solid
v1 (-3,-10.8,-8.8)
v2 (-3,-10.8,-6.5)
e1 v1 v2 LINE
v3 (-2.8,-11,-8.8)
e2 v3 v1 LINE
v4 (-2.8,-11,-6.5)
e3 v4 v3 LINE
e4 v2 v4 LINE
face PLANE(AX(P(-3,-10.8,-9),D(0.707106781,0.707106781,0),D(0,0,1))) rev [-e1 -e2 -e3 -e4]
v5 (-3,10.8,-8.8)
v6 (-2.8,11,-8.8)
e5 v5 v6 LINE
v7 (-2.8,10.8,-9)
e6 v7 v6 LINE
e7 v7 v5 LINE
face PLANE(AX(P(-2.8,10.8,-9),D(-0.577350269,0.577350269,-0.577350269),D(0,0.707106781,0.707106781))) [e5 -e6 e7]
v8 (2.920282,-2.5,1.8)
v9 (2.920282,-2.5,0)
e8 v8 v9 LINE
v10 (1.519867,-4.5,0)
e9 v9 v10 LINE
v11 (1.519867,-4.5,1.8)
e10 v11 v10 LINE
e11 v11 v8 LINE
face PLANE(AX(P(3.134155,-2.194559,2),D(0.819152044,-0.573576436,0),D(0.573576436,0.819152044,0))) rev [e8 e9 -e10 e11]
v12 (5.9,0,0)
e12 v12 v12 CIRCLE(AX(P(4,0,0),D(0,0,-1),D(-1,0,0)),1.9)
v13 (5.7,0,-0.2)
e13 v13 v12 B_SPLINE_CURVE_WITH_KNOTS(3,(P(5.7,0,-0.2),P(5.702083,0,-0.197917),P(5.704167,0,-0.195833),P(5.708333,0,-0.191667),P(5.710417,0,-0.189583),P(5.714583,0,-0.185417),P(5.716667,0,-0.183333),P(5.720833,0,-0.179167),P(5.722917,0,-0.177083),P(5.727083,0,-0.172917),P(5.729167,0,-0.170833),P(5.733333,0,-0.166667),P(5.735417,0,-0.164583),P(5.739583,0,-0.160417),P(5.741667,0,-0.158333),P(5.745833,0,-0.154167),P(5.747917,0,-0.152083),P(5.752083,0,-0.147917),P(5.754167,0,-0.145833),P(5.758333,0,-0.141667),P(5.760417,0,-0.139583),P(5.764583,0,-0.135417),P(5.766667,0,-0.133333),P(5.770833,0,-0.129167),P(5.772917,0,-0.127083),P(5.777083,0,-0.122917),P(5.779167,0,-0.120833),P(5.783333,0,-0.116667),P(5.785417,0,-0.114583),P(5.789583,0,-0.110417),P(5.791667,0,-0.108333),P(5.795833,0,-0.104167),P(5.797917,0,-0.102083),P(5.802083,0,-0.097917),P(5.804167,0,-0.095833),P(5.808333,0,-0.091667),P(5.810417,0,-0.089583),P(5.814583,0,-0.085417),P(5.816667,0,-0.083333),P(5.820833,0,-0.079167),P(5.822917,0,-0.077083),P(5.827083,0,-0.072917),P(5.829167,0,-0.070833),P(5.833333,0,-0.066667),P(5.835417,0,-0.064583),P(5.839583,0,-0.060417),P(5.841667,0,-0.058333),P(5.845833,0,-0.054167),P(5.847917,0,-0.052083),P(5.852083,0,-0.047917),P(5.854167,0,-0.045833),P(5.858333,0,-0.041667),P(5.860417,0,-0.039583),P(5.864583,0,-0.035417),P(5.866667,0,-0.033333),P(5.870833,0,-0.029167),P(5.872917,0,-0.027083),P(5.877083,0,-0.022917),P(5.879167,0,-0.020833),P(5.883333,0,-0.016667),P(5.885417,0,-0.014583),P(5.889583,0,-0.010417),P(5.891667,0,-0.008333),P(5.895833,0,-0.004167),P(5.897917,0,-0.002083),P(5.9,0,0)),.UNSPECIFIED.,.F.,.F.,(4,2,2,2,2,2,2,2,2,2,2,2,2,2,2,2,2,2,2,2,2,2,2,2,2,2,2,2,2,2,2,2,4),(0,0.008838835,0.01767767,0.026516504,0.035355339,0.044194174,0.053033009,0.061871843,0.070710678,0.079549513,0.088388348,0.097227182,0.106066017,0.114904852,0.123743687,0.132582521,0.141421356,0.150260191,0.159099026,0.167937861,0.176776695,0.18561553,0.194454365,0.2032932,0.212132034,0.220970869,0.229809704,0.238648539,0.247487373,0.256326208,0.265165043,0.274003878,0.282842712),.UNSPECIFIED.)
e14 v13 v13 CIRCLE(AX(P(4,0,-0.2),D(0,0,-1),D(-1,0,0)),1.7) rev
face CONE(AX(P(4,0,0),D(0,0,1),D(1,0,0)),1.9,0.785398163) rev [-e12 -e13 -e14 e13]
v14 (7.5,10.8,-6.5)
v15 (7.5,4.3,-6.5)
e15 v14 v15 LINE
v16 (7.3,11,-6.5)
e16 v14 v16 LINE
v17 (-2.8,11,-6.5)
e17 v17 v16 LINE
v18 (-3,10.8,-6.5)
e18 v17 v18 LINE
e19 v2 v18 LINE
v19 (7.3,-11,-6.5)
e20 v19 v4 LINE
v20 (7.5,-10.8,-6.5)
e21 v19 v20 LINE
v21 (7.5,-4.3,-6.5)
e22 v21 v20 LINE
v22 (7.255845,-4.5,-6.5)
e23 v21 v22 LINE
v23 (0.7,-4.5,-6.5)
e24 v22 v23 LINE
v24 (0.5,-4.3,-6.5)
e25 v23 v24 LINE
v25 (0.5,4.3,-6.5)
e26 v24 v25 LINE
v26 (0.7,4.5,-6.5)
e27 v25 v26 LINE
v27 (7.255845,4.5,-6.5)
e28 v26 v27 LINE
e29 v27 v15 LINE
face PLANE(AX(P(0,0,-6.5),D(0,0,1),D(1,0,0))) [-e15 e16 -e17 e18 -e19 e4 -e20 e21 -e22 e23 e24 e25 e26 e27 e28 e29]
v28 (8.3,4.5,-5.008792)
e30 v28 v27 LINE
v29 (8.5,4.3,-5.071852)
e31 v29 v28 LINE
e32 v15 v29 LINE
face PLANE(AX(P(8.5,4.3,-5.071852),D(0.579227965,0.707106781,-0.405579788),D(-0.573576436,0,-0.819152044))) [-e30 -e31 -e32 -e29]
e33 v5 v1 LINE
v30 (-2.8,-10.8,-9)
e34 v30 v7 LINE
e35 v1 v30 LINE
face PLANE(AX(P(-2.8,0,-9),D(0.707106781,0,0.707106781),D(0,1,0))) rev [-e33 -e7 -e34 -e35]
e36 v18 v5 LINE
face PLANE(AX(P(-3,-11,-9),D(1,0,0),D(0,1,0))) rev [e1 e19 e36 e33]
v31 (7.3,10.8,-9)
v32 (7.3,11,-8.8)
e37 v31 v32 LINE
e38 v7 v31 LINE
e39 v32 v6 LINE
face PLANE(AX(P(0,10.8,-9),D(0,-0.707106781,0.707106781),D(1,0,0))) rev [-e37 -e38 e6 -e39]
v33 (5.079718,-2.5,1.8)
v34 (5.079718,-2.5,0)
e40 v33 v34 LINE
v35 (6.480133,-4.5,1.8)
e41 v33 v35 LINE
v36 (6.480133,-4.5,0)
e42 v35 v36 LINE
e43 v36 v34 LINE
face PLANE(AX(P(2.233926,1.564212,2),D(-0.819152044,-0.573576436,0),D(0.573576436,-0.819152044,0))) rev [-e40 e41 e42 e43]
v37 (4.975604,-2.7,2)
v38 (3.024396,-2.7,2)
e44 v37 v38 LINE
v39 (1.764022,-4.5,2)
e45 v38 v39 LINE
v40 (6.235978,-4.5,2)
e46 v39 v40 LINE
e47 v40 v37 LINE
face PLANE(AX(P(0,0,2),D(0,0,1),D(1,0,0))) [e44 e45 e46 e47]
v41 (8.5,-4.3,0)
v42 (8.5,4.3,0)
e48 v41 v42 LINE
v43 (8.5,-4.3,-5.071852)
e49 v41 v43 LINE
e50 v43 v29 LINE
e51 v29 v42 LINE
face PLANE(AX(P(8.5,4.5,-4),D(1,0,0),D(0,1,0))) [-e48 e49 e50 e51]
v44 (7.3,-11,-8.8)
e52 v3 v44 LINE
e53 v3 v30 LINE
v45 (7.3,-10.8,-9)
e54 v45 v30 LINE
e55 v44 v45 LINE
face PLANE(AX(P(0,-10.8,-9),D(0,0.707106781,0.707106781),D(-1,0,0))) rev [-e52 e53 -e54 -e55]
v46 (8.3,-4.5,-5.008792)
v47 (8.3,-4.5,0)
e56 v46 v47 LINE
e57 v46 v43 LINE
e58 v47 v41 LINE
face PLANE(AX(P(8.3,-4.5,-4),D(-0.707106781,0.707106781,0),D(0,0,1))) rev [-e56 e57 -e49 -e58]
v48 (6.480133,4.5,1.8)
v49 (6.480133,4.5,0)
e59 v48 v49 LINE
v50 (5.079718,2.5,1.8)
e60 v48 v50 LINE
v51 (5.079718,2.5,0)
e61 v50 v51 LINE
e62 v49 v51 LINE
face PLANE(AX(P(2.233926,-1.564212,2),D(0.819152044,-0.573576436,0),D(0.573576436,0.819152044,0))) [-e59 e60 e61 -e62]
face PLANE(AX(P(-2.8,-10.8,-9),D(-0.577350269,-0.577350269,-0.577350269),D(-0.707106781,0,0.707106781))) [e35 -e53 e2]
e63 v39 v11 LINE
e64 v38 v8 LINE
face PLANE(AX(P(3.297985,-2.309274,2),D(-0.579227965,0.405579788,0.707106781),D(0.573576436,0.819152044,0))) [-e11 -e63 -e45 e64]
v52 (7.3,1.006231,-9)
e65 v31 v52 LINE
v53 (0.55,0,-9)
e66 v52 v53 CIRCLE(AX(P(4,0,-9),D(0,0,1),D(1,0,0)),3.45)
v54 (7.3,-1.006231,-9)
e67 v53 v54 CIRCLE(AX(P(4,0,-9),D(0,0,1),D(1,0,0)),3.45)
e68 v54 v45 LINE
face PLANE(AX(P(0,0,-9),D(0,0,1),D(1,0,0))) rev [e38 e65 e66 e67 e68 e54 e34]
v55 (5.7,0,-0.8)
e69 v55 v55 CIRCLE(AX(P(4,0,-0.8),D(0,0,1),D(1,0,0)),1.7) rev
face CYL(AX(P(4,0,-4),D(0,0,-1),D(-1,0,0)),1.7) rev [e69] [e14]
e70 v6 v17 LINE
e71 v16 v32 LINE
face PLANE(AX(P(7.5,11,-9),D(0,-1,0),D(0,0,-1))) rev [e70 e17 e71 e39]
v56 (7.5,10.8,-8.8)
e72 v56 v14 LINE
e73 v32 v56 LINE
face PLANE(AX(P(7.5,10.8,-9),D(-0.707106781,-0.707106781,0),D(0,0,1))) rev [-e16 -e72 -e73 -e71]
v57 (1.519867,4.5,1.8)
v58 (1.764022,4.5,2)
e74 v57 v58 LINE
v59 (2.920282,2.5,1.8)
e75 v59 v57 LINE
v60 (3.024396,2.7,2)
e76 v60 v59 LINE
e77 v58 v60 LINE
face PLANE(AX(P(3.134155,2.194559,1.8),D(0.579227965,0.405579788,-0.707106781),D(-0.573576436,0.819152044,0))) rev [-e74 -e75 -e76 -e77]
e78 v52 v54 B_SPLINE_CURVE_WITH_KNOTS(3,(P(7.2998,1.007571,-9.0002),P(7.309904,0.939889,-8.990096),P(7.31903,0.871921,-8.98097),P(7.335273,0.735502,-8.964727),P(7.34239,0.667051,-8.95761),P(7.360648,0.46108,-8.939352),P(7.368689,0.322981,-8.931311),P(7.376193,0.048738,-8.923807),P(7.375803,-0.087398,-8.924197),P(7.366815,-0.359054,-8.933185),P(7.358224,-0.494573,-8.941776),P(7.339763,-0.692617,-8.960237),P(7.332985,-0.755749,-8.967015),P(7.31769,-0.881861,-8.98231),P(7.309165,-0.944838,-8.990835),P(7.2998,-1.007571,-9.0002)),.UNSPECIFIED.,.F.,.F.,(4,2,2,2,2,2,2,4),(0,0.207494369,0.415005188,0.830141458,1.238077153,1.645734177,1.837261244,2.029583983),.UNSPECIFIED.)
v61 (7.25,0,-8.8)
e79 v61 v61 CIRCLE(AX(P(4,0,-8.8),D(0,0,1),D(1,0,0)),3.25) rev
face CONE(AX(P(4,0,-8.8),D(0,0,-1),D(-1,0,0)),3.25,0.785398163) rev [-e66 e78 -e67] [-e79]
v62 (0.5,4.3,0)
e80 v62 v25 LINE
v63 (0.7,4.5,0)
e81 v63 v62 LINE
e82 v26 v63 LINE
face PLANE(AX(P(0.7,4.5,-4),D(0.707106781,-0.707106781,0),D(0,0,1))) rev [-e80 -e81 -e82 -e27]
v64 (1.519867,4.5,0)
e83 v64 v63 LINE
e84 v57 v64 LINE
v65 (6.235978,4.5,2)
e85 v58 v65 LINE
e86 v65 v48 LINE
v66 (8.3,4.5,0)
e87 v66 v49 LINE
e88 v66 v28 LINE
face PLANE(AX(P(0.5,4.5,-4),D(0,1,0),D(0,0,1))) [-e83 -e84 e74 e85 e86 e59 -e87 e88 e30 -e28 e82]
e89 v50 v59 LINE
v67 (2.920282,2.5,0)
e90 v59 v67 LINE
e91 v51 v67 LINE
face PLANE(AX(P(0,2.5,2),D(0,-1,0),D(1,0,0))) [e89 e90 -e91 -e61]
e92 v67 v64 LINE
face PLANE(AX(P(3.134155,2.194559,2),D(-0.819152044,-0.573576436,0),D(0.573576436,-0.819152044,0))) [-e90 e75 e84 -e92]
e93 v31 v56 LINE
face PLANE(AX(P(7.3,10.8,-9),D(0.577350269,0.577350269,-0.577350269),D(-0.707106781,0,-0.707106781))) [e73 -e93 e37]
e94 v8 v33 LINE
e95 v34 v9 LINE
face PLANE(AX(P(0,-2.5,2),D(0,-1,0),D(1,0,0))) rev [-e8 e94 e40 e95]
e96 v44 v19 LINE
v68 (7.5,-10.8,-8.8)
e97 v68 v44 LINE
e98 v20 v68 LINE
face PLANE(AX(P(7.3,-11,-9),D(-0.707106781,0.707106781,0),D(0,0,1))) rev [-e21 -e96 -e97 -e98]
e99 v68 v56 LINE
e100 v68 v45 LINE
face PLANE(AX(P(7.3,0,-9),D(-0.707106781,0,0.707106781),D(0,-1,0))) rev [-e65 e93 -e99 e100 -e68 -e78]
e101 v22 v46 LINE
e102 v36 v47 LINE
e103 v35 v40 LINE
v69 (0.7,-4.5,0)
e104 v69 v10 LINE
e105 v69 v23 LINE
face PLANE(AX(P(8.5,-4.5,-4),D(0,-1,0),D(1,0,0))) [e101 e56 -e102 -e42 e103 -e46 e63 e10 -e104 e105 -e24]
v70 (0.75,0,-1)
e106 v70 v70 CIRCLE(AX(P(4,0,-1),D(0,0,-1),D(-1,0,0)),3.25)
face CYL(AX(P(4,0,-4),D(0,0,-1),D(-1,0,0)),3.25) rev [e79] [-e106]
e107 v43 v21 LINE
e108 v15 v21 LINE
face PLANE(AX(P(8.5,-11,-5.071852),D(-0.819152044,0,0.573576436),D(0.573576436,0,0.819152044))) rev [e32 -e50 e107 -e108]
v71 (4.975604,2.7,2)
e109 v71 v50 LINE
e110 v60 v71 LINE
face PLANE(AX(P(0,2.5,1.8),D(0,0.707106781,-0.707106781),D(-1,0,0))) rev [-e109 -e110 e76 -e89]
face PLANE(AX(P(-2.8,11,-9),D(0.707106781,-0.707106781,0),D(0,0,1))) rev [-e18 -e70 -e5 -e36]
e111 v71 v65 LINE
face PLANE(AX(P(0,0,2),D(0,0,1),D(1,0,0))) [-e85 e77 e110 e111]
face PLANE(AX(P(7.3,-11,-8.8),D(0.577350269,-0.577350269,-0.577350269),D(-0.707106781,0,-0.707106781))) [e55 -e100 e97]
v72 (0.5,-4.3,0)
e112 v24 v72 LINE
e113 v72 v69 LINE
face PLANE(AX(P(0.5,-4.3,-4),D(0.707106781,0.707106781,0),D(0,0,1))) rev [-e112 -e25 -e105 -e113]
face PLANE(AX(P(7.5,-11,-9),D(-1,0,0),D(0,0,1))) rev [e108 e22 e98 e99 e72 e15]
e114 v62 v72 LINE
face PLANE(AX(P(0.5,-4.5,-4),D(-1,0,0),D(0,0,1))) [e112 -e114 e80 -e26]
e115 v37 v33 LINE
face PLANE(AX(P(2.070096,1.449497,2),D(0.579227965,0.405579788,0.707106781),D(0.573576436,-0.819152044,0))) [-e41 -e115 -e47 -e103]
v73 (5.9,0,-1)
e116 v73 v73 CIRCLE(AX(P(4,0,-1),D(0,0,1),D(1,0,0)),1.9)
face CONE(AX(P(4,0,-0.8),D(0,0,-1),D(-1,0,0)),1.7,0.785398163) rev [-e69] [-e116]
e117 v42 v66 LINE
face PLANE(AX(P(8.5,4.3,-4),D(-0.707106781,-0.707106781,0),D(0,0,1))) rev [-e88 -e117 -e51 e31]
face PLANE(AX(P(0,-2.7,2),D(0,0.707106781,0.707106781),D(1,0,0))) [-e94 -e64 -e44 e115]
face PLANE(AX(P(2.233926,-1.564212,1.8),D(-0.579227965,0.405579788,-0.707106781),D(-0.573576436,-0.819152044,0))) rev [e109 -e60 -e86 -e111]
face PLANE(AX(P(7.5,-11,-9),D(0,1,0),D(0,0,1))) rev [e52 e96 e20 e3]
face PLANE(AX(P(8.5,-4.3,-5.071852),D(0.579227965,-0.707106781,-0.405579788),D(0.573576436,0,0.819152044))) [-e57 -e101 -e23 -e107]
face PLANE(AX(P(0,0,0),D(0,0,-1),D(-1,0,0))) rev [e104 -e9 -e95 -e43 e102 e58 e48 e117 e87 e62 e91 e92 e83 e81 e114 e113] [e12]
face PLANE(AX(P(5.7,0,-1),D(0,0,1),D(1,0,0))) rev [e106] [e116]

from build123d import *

# Parameters (mm, degrees)
BOSS_EXTRUDE1_DEPTH            = 4
SLOT_TAB_DEPTH                 = 2
CBORE_FOR_M3_SHCS2_D           = 3.4
CBORE_FOR_M3_SHCS2_CBORE_D     = 6.5
CBORE_FOR_M3_SHCS2_CBORE_DEPTH = 3
STOPPER_START                  = 2.5
SKETCH3_W                      = 8
SKETCH3_H                      = 9
SKETCH3_R                      = 3.25
STOPPER_CLEARANCE_DEPTH        = 2.5
SKETCH4_W                      = 10.5
SKETCH4_H                      = 22
SKETCH4_R                      = 3.25
STOPPER_DEPTH                  = 2.5
PRINT_CHAMFER_DEPTH            = 17.560495216
PRINT_CHAMFER_DEPTH_BACK       = 17.560495216
CHAMFER5_SIZE                  = 0.2


with BuildPart() as part:
    # Sketch1 → Boss-Extrude1 (new body)
    with BuildSketch(Plane.XY):
        Polygon((0.5, -4.5), (7.5, -4.5), (8.5, -4.5), (8.5, 4.5), (7.5, 4.5), (0.5, 4.5), align=None)
    extrude(amount=-BOSS_EXTRUDE1_DEPTH)

    # Sketch2 → Slot Tab (add)
    with BuildSketch(Plane.XY):
        Polygon((2.92028223, -2.5), (1.519867154, -4.5), (6.480132846, -4.5), (5.07971777, -2.5), align=None)
    slot_tab = extrude(amount=SLOT_TAB_DEPTH)

    # Slot Tabs: Slot Tab across plane
    add(slot_tab.mirror(Plane.ZX))

    # CBORE for M3 SHCS2 (through all)
    with Locations(Plane(origin=(0, 0, -4), x_dir=(-1, 0, 0), z_dir=(0, 0, -1))):
        with Locations((-4, 0)):
            CounterBoreHole(CBORE_FOR_M3_SHCS2_D / 2, CBORE_FOR_M3_SHCS2_CBORE_D / 2, CBORE_FOR_M3_SHCS2_CBORE_DEPTH)

    # Sketch3 → Stopper Clearance (add)
    with BuildSketch(Plane(origin=(0, 0, -4), x_dir=(-1, 0, 0), z_dir=(0, 0, -1)).offset(STOPPER_START)):
        with Locations((-4.5, 0)):
            Rectangle(SKETCH3_W, SKETCH3_H)
        with Locations((-4, 0)):
            Circle(SKETCH3_R, mode=Mode.SUBTRACT)
    extrude(amount=-STOPPER_CLEARANCE_DEPTH)

    # Sketch4 → Stopper (add)
    with BuildSketch(Plane(origin=(0, 0, -6.5), x_dir=(-1, 0, 0), z_dir=(0, 0, -1)).offset(STOPPER_START)):
        with Locations((-2.25, 0)):
            Rectangle(SKETCH4_W, SKETCH4_H)
        with Locations((-4, 0)):
            Circle(SKETCH4_R, mode=Mode.SUBTRACT)
    extrude(amount=-STOPPER_DEPTH)

    # Deburs With Stopper
    # the kernel refuses this chamfer: 0.2 mm, written as the material it takes off along each edge
    with BuildSketch(Plane(origin=(-2.866666667, -10.866666667, -8.866666667), x_dir=(-0.7071067811865491, 0, 0.707106781186546), z_dir=(-0.5773502691896235, -0.5773502691896274, -0.5773502691896262)), Plane(origin=(-2.866666667, 10.866666667, -8.866666667), x_dir=(1.5700924586837806e-15, 0.7071067811865476, 0.7071067811865476), z_dir=(-0.5773502691896244, 0.5773502691896271, -0.5773502691896257)), Plane(origin=(7.366666667, 10.866666667, -8.866666667), x_dir=(0.7071067811865491, 0, 0.707106781186546), z_dir=(0.5773502691896232, 0.5773502691896284, -0.5773502691896257))) as deburs_with_stopper_piece_1:
        Polygon((-0.141421356, 0.081649658), (0.141421356, 0.081649658), (0, -0.163299316), align=None)
    extrude(amount=0.254034118, mode=Mode.SUBTRACT)
    with BuildSketch(Plane(origin=(7.366666667, -10.866666667, -8.866666667), x_dir=(0.7071067811865491, 0, 0.707106781186546), z_dir=(0.5773502691896241, -0.5773502691896267, -0.5773502691896267))) as deburs_with_stopper_piece_2:
        Polygon((-0.141421356, -0.081649658), (0.141421356, -0.081649658), (0, 0.163299316), align=None)
    extrude(amount=0.254034118, mode=Mode.SUBTRACT)
    with BuildSketch(Plane(origin=(8.5, 4.5, -7.014336598), x_dir=(-0.9996219169112966, 0.02749587661058742, 0), z_dir=(0, 0, 1))) as deburs_with_stopper_piece_3:
        with BuildLine():
            Line((0.205734639, 0), (-0.011309431, 0.205423559))
            Line((-0.011309431, 0.205423559), (-0.015307919, 0.205313575))
            ThreePointArc((-0.015307919, 0.205313575), (-0.006825845, 0.102679566), (-0.003998488, -0.000109984))
            Line((-0.003998488, -0.000109984), (0.000109984, -0.003998488))
            ThreePointArc((0.000109984, -0.003998488), (0.102899533, -0.00117113), (0.205844623, -0.003998488))
            Line((0.205844623, -0.003998488), (0.205734639, 0))
        make_face()
    extrude(amount=7.528673195, mode=Mode.SUBTRACT)
    with BuildSketch(Plane(origin=(8.5, -4.5, -7.014336598), x_dir=(-0.9996219169112966, -0.02749587661058742, 0), z_dir=(0, 0, 1))) as deburs_with_stopper_piece_4:
        with BuildLine():
            Line((0.205734639, 0), (-0.011309431, -0.205423559))
            Line((-0.011309431, -0.205423559), (-0.015307919, -0.205313575))
            ThreePointArc((-0.015307919, -0.205313575), (-0.006825845, -0.102679566), (-0.003998488, 0.000109984))
            Line((-0.003998488, 0.000109984), (0.000109984, 0.003998488))
            ThreePointArc((0.000109984, 0.003998488), (0.102899533, 0.00117113), (0.205844623, 0.003998488))
            Line((0.205844623, 0.003998488), (0.205734639, 0))
        make_face()
    extrude(amount=7.528673195, mode=Mode.SUBTRACT)
    with BuildSketch(Plane(origin=(0.5, -4.5, 0.514336598), x_dir=(0.9996219169112966, -0.02749587661058736, 0), z_dir=(0, 0, -1))) as deburs_with_stopper_piece_5:
        with BuildLine():
            Line((0.205734639, 0), (-0.011309431, -0.205423559))
            Line((-0.011309431, -0.205423559), (-0.015307919, -0.205313575))
            ThreePointArc((-0.015307919, -0.205313575), (-0.006825845, -0.102679566), (-0.003998488, 0.000109984))
            Line((-0.003998488, 0.000109984), (0.000109984, 0.003998488))
            ThreePointArc((0.000109984, 0.003998488), (0.102899533, 0.00117113), (0.205844623, 0.003998488))
            Line((0.205844623, 0.003998488), (0.205734639, 0))
        make_face()
    extrude(amount=7.014336598, mode=Mode.SUBTRACT)
    with BuildSketch(Plane(origin=(0.5, 4.5, 0.514336598), x_dir=(0.9996219169112966, 0.02749587661058733, 0), z_dir=(0, 0, -1))) as deburs_with_stopper_piece_6:
        with BuildLine():
            Line((0.205734639, 0), (-0.011309431, 0.205423559))
            Line((-0.011309431, 0.205423559), (-0.015307919, 0.205313575))
            ThreePointArc((-0.015307919, 0.205313575), (-0.006825845, 0.102679566), (-0.003998488, -0.000109984))
            Line((-0.003998488, -0.000109984), (0.000109984, -0.003998488))
            ThreePointArc((0.000109984, -0.003998488), (0.102899533, -0.00117113), (0.205844623, -0.003998488))
            Line((0.205844623, -0.003998488), (0.205734639, 0))
        make_face()
    extrude(amount=7.014336598, mode=Mode.SUBTRACT)
    with BuildSketch(Plane(origin=(6.775144199, -4.921319875, 2), x_dir=(-0.8188423367539712, -0.5733595768003803, 0.02749587661058727), z_dir=(-0.5735764363510434, 0.8191520442889937, 0)), Plane(origin=(3.215293583, 2.078680125, 2), x_dir=(-0.02252330353507913, -0.015770986920647746, -0.9996219169112968), z_dir=(-0.5735764363510445, 0.8191520442889929, 0))) as deburs_with_stopper_piece_7:
        with BuildLine():
            Line((0.205734639, 0), (-0.011309431, -0.205423559))
            Line((-0.011309431, -0.205423559), (-0.015307919, -0.205313575))
            ThreePointArc((-0.015307919, -0.205313575), (-0.006825845, -0.102679566), (-0.003998488, 0.000109984))
            Line((-0.003998488, 0.000109984), (0.000109984, 0.003998488))
            ThreePointArc((0.000109984, 0.003998488), (0.102899533, 0.00117113), (0.205844623, 0.003998488))
            Line((0.205844623, 0.003998488), (0.205734639, 0))
        make_face()
    extrude(amount=3.470222373, mode=Mode.SUBTRACT)
    with BuildSketch(Plane(origin=(5.594054367, -2.5, 2), x_dir=(0, 0.02749587661058736, -0.9996219169112966), z_dir=(-1, 0, 0)), Plane(origin=(5.594054367, 2.5, 2), x_dir=(0, 0.9996219169112966, 0.027495876610587302), z_dir=(-1, 0, 0))) as deburs_with_stopper_piece_8:
        with BuildLine():
            Line((0.205734639, 0), (-0.011309431, 0.205423559))
            Line((-0.011309431, 0.205423559), (-0.015307919, 0.205313575))
            ThreePointArc((-0.015307919, 0.205313575), (-0.006825845, 0.102679566), (-0.003998488, -0.000109984))
            Line((-0.003998488, -0.000109984), (0.000109984, -0.003998488))
            ThreePointArc((0.000109984, -0.003998488), (0.102899533, -0.00117113), (0.205844623, -0.003998488))
            Line((0.205844623, -0.003998488), (0.205734639, 0))
        make_face()
    extrude(amount=3.188108734, mode=Mode.SUBTRACT)
    with BuildSketch(Plane(origin=(3.215293583, -2.078680125, 2), x_dir=(-0.02252330353507913, 0.015770986920647746, -0.9996219169112968), z_dir=(-0.5735764363510445, -0.8191520442889929, 0)), Plane(origin=(6.775144199, 4.921319875, 2), x_dir=(-0.8188423367539712, 0.5733595768003803, 0.02749587661058727), z_dir=(-0.5735764363510434, -0.8191520442889937, 0))) as deburs_with_stopper_piece_9:
        with BuildLine():
            Line((0.205734639, 0), (-0.011309431, 0.205423559))
            Line((-0.011309431, 0.205423559), (-0.015307919, 0.205313575))
            ThreePointArc((-0.015307919, 0.205313575), (-0.006825845, 0.102679566), (-0.003998488, -0.000109984))
            Line((-0.003998488, -0.000109984), (0.000109984, -0.003998488))
            ThreePointArc((0.000109984, -0.003998488), (0.102899533, -0.00117113), (0.205844623, -0.003998488))
            Line((0.205844623, -0.003998488), (0.205734639, 0))
        make_face()
    extrude(amount=3.470222373, mode=Mode.SUBTRACT)
    with BuildSketch(Plane(origin=(4, 0, 0), x_dir=(1, 0, 0), z_dir=(0, -1, 0))) as deburs_with_stopper_piece_10:
        with BuildLine():
            Line((1.905656854, 0.005656854), (1.694343146, -0.205656854))
            Line((1.694343146, -0.205656854), (1.690343146, -0.205656854))
            ThreePointArc((1.690343146, -0.205656854), (1.696, -0.102828427), (1.696, 0))
            Line((1.696, 0), (1.7, 0.004))
            ThreePointArc((1.7, 0.004), (1.802828427, 0.004), (1.905656854, 0.009656854))
            Line((1.905656854, 0.009656854), (1.905656854, 0.005656854))
        make_face()
    revolve(axis=Axis((4, 0, 0), (0, 0, 1)), mode=Mode.SUBTRACT)
    with BuildSketch(Plane(origin=(4, 0, -1), x_dir=(1, 0, 0), z_dir=(0, -1, 0))) as deburs_with_stopper_piece_11:
        with BuildLine():
            Line((1.694343146, 0.205656854), (1.905656854, -0.005656854))
            Line((1.905656854, -0.005656854), (1.905656854, -0.009656854))
            ThreePointArc((1.905656854, -0.009656854), (1.802828427, -0.004), (1.7, -0.004))
            Line((1.7, -0.004), (1.696, 0))
            ThreePointArc((1.696, 0), (1.696, 0.102828427), (1.690343146, 0.205656854))
            Line((1.690343146, 0.205656854), (1.694343146, 0.205656854))
        make_face()
    revolve(axis=Axis((4, 0, -1), (0, 0, 1)), mode=Mode.SUBTRACT)
    with BuildSketch(Plane(origin=(-3, -11.514336598, -9), x_dir=(0.9996219169112966, 0, -0.027495876610587302), z_dir=(0, 1, 0)), Plane(origin=(7.5, 11.514336598, -9), x_dir=(-0.9996219169112966, 0, -0.02749587661058742), z_dir=(0, -1, 0))) as deburs_with_stopper_piece_12:
        with BuildLine():
            Line((0.205734639, 0), (-0.011309431, -0.205423559))
            Line((-0.011309431, -0.205423559), (-0.015307919, -0.205313575))
            ThreePointArc((-0.015307919, -0.205313575), (-0.006825845, -0.102679566), (-0.003998488, 0.000109984))
            Line((-0.003998488, 0.000109984), (0.000109984, 0.003998488))
            ThreePointArc((0.000109984, 0.003998488), (0.102899533, 0.00117113), (0.205844623, 0.003998488))
            Line((0.205844623, 0.003998488), (0.205734639, 0))
        make_face()
    extrude(amount=23.028673195, mode=Mode.SUBTRACT)
    with BuildSketch(Plane(origin=(-3.514336598, 11, -9), x_dir=(0, -0.9996219169112966, -0.02749587661058742), z_dir=(1, 0, 0)), Plane(origin=(8.014336598, -11, -9), x_dir=(0, 0.9996219169112966, -0.02749587661058742), z_dir=(-1, 0, 0))) as deburs_with_stopper_piece_13:
        with BuildLine():
            Line((0.205734639, 0), (-0.011309431, -0.205423559))
            Line((-0.011309431, -0.205423559), (-0.015307919, -0.205313575))
            ThreePointArc((-0.015307919, -0.205313575), (-0.006825845, -0.102679566), (-0.003998488, 0.000109984))
            Line((-0.003998488, 0.000109984), (0.000109984, 0.003998488))
            ThreePointArc((0.000109984, 0.003998488), (0.102899533, 0.00117113), (0.205844623, 0.003998488))
            Line((0.205844623, 0.003998488), (0.205734639, 0))
        make_face()
    extrude(amount=11.528673195, mode=Mode.SUBTRACT)
    with BuildSketch(Plane(origin=(-3, -11, -9.514336598), x_dir=(-0.02749587661058742, 0.9996219169112966, 0), z_dir=(0, 0, 1)), Plane(origin=(-3, 11, -9.514336598), x_dir=(0.9996219169112966, 0.027495876610587302, 0), z_dir=(0, 0, 1)), Plane(origin=(7.5, 11, -9.514336598), x_dir=(0.02749587661058742, -0.9996219169112966, 0), z_dir=(0, 0, 1))) as deburs_with_stopper_piece_14:
        with BuildLine():
            Line((0.205734639, 0), (-0.011309431, -0.205423559))
            Line((-0.011309431, -0.205423559), (-0.015307919, -0.205313575))
            ThreePointArc((-0.015307919, -0.205313575), (-0.006825845, -0.102679566), (-0.003998488, 0.000109984))
            Line((-0.003998488, 0.000109984), (0.000109984, 0.003998488))
            ThreePointArc((0.000109984, 0.003998488), (0.102899533, 0.00117113), (0.205844623, 0.003998488))
            Line((0.205844623, 0.003998488), (0.205734639, 0))
        make_face()
    extrude(amount=3.528673195, mode=Mode.SUBTRACT)
    with BuildSketch(Plane(origin=(7.5, -11, -9.514336598), x_dir=(0.02749587661058742, 0.9996219169112966, 0), z_dir=(0, 0, 1))) as deburs_with_stopper_piece_15:
        with BuildLine():
            Line((0.205734639, 0), (-0.011309431, 0.205423559))
            Line((-0.011309431, 0.205423559), (-0.015307919, 0.205313575))
            ThreePointArc((-0.015307919, 0.205313575), (-0.006825845, 0.102679566), (-0.003998488, -0.000109984))
            Line((-0.003998488, -0.000109984), (0.000109984, -0.003998488))
            ThreePointArc((0.000109984, -0.003998488), (0.102899533, -0.00117113), (0.205844623, -0.003998488))
            Line((0.205844623, -0.003998488), (0.205734639, 0))
        make_face()
    extrude(amount=3.528673195, mode=Mode.SUBTRACT)
    with BuildSketch(Plane(origin=(4, 0, -9), x_dir=(-1, 0, 0), z_dir=(0, -1, 0))) as deburs_with_stopper_piece_16:
        with BuildLine():
            Line((3.244343146, -0.205656854), (3.455656854, 0.005656854))
            Line((3.455656854, 0.005656854), (3.455656854, 0.009656854))
            ThreePointArc((3.455656854, 0.009656854), (3.352828427, 0.004), (3.25, 0.004))
            Line((3.25, 0.004), (3.246, 0))
            ThreePointArc((3.246, 0), (3.246, -0.102828427), (3.240343146, -0.205656854))
            Line((3.240343146, -0.205656854), (3.244343146, -0.205656854))
        make_face()
    revolve(axis=Axis((4, 0, -9), (0, 0, -1)), mode=Mode.SUBTRACT)

    # Sketch10 → Print Chamfer (cut, two sides: drawn at the far end of the back side and taken through both)
    with BuildSketch(Plane(origin=(0, 0, 0), x_dir=(1, 0, 0), z_dir=(0, 1, 0)).offset(-PRINT_CHAMFER_DEPTH_BACK)):
        Polygon((7.5, 6.5), (8.5, 6.5), (8.5, 5.071851993), align=None)
    extrude(amount=PRINT_CHAMFER_DEPTH + PRINT_CHAMFER_DEPTH_BACK, mode=Mode.SUBTRACT)

    # Chamfer5
    chamfer5_edges = [part.edges().sort_by_distance(p)[0] for p in [
        (7.9, 4.5, -5.928740797),
        (7.9, -4.5, -5.928740797),
    ]]
    chamfer(chamfer5_edges, length=CHAMFER5_SIZE)


solid = part.part
